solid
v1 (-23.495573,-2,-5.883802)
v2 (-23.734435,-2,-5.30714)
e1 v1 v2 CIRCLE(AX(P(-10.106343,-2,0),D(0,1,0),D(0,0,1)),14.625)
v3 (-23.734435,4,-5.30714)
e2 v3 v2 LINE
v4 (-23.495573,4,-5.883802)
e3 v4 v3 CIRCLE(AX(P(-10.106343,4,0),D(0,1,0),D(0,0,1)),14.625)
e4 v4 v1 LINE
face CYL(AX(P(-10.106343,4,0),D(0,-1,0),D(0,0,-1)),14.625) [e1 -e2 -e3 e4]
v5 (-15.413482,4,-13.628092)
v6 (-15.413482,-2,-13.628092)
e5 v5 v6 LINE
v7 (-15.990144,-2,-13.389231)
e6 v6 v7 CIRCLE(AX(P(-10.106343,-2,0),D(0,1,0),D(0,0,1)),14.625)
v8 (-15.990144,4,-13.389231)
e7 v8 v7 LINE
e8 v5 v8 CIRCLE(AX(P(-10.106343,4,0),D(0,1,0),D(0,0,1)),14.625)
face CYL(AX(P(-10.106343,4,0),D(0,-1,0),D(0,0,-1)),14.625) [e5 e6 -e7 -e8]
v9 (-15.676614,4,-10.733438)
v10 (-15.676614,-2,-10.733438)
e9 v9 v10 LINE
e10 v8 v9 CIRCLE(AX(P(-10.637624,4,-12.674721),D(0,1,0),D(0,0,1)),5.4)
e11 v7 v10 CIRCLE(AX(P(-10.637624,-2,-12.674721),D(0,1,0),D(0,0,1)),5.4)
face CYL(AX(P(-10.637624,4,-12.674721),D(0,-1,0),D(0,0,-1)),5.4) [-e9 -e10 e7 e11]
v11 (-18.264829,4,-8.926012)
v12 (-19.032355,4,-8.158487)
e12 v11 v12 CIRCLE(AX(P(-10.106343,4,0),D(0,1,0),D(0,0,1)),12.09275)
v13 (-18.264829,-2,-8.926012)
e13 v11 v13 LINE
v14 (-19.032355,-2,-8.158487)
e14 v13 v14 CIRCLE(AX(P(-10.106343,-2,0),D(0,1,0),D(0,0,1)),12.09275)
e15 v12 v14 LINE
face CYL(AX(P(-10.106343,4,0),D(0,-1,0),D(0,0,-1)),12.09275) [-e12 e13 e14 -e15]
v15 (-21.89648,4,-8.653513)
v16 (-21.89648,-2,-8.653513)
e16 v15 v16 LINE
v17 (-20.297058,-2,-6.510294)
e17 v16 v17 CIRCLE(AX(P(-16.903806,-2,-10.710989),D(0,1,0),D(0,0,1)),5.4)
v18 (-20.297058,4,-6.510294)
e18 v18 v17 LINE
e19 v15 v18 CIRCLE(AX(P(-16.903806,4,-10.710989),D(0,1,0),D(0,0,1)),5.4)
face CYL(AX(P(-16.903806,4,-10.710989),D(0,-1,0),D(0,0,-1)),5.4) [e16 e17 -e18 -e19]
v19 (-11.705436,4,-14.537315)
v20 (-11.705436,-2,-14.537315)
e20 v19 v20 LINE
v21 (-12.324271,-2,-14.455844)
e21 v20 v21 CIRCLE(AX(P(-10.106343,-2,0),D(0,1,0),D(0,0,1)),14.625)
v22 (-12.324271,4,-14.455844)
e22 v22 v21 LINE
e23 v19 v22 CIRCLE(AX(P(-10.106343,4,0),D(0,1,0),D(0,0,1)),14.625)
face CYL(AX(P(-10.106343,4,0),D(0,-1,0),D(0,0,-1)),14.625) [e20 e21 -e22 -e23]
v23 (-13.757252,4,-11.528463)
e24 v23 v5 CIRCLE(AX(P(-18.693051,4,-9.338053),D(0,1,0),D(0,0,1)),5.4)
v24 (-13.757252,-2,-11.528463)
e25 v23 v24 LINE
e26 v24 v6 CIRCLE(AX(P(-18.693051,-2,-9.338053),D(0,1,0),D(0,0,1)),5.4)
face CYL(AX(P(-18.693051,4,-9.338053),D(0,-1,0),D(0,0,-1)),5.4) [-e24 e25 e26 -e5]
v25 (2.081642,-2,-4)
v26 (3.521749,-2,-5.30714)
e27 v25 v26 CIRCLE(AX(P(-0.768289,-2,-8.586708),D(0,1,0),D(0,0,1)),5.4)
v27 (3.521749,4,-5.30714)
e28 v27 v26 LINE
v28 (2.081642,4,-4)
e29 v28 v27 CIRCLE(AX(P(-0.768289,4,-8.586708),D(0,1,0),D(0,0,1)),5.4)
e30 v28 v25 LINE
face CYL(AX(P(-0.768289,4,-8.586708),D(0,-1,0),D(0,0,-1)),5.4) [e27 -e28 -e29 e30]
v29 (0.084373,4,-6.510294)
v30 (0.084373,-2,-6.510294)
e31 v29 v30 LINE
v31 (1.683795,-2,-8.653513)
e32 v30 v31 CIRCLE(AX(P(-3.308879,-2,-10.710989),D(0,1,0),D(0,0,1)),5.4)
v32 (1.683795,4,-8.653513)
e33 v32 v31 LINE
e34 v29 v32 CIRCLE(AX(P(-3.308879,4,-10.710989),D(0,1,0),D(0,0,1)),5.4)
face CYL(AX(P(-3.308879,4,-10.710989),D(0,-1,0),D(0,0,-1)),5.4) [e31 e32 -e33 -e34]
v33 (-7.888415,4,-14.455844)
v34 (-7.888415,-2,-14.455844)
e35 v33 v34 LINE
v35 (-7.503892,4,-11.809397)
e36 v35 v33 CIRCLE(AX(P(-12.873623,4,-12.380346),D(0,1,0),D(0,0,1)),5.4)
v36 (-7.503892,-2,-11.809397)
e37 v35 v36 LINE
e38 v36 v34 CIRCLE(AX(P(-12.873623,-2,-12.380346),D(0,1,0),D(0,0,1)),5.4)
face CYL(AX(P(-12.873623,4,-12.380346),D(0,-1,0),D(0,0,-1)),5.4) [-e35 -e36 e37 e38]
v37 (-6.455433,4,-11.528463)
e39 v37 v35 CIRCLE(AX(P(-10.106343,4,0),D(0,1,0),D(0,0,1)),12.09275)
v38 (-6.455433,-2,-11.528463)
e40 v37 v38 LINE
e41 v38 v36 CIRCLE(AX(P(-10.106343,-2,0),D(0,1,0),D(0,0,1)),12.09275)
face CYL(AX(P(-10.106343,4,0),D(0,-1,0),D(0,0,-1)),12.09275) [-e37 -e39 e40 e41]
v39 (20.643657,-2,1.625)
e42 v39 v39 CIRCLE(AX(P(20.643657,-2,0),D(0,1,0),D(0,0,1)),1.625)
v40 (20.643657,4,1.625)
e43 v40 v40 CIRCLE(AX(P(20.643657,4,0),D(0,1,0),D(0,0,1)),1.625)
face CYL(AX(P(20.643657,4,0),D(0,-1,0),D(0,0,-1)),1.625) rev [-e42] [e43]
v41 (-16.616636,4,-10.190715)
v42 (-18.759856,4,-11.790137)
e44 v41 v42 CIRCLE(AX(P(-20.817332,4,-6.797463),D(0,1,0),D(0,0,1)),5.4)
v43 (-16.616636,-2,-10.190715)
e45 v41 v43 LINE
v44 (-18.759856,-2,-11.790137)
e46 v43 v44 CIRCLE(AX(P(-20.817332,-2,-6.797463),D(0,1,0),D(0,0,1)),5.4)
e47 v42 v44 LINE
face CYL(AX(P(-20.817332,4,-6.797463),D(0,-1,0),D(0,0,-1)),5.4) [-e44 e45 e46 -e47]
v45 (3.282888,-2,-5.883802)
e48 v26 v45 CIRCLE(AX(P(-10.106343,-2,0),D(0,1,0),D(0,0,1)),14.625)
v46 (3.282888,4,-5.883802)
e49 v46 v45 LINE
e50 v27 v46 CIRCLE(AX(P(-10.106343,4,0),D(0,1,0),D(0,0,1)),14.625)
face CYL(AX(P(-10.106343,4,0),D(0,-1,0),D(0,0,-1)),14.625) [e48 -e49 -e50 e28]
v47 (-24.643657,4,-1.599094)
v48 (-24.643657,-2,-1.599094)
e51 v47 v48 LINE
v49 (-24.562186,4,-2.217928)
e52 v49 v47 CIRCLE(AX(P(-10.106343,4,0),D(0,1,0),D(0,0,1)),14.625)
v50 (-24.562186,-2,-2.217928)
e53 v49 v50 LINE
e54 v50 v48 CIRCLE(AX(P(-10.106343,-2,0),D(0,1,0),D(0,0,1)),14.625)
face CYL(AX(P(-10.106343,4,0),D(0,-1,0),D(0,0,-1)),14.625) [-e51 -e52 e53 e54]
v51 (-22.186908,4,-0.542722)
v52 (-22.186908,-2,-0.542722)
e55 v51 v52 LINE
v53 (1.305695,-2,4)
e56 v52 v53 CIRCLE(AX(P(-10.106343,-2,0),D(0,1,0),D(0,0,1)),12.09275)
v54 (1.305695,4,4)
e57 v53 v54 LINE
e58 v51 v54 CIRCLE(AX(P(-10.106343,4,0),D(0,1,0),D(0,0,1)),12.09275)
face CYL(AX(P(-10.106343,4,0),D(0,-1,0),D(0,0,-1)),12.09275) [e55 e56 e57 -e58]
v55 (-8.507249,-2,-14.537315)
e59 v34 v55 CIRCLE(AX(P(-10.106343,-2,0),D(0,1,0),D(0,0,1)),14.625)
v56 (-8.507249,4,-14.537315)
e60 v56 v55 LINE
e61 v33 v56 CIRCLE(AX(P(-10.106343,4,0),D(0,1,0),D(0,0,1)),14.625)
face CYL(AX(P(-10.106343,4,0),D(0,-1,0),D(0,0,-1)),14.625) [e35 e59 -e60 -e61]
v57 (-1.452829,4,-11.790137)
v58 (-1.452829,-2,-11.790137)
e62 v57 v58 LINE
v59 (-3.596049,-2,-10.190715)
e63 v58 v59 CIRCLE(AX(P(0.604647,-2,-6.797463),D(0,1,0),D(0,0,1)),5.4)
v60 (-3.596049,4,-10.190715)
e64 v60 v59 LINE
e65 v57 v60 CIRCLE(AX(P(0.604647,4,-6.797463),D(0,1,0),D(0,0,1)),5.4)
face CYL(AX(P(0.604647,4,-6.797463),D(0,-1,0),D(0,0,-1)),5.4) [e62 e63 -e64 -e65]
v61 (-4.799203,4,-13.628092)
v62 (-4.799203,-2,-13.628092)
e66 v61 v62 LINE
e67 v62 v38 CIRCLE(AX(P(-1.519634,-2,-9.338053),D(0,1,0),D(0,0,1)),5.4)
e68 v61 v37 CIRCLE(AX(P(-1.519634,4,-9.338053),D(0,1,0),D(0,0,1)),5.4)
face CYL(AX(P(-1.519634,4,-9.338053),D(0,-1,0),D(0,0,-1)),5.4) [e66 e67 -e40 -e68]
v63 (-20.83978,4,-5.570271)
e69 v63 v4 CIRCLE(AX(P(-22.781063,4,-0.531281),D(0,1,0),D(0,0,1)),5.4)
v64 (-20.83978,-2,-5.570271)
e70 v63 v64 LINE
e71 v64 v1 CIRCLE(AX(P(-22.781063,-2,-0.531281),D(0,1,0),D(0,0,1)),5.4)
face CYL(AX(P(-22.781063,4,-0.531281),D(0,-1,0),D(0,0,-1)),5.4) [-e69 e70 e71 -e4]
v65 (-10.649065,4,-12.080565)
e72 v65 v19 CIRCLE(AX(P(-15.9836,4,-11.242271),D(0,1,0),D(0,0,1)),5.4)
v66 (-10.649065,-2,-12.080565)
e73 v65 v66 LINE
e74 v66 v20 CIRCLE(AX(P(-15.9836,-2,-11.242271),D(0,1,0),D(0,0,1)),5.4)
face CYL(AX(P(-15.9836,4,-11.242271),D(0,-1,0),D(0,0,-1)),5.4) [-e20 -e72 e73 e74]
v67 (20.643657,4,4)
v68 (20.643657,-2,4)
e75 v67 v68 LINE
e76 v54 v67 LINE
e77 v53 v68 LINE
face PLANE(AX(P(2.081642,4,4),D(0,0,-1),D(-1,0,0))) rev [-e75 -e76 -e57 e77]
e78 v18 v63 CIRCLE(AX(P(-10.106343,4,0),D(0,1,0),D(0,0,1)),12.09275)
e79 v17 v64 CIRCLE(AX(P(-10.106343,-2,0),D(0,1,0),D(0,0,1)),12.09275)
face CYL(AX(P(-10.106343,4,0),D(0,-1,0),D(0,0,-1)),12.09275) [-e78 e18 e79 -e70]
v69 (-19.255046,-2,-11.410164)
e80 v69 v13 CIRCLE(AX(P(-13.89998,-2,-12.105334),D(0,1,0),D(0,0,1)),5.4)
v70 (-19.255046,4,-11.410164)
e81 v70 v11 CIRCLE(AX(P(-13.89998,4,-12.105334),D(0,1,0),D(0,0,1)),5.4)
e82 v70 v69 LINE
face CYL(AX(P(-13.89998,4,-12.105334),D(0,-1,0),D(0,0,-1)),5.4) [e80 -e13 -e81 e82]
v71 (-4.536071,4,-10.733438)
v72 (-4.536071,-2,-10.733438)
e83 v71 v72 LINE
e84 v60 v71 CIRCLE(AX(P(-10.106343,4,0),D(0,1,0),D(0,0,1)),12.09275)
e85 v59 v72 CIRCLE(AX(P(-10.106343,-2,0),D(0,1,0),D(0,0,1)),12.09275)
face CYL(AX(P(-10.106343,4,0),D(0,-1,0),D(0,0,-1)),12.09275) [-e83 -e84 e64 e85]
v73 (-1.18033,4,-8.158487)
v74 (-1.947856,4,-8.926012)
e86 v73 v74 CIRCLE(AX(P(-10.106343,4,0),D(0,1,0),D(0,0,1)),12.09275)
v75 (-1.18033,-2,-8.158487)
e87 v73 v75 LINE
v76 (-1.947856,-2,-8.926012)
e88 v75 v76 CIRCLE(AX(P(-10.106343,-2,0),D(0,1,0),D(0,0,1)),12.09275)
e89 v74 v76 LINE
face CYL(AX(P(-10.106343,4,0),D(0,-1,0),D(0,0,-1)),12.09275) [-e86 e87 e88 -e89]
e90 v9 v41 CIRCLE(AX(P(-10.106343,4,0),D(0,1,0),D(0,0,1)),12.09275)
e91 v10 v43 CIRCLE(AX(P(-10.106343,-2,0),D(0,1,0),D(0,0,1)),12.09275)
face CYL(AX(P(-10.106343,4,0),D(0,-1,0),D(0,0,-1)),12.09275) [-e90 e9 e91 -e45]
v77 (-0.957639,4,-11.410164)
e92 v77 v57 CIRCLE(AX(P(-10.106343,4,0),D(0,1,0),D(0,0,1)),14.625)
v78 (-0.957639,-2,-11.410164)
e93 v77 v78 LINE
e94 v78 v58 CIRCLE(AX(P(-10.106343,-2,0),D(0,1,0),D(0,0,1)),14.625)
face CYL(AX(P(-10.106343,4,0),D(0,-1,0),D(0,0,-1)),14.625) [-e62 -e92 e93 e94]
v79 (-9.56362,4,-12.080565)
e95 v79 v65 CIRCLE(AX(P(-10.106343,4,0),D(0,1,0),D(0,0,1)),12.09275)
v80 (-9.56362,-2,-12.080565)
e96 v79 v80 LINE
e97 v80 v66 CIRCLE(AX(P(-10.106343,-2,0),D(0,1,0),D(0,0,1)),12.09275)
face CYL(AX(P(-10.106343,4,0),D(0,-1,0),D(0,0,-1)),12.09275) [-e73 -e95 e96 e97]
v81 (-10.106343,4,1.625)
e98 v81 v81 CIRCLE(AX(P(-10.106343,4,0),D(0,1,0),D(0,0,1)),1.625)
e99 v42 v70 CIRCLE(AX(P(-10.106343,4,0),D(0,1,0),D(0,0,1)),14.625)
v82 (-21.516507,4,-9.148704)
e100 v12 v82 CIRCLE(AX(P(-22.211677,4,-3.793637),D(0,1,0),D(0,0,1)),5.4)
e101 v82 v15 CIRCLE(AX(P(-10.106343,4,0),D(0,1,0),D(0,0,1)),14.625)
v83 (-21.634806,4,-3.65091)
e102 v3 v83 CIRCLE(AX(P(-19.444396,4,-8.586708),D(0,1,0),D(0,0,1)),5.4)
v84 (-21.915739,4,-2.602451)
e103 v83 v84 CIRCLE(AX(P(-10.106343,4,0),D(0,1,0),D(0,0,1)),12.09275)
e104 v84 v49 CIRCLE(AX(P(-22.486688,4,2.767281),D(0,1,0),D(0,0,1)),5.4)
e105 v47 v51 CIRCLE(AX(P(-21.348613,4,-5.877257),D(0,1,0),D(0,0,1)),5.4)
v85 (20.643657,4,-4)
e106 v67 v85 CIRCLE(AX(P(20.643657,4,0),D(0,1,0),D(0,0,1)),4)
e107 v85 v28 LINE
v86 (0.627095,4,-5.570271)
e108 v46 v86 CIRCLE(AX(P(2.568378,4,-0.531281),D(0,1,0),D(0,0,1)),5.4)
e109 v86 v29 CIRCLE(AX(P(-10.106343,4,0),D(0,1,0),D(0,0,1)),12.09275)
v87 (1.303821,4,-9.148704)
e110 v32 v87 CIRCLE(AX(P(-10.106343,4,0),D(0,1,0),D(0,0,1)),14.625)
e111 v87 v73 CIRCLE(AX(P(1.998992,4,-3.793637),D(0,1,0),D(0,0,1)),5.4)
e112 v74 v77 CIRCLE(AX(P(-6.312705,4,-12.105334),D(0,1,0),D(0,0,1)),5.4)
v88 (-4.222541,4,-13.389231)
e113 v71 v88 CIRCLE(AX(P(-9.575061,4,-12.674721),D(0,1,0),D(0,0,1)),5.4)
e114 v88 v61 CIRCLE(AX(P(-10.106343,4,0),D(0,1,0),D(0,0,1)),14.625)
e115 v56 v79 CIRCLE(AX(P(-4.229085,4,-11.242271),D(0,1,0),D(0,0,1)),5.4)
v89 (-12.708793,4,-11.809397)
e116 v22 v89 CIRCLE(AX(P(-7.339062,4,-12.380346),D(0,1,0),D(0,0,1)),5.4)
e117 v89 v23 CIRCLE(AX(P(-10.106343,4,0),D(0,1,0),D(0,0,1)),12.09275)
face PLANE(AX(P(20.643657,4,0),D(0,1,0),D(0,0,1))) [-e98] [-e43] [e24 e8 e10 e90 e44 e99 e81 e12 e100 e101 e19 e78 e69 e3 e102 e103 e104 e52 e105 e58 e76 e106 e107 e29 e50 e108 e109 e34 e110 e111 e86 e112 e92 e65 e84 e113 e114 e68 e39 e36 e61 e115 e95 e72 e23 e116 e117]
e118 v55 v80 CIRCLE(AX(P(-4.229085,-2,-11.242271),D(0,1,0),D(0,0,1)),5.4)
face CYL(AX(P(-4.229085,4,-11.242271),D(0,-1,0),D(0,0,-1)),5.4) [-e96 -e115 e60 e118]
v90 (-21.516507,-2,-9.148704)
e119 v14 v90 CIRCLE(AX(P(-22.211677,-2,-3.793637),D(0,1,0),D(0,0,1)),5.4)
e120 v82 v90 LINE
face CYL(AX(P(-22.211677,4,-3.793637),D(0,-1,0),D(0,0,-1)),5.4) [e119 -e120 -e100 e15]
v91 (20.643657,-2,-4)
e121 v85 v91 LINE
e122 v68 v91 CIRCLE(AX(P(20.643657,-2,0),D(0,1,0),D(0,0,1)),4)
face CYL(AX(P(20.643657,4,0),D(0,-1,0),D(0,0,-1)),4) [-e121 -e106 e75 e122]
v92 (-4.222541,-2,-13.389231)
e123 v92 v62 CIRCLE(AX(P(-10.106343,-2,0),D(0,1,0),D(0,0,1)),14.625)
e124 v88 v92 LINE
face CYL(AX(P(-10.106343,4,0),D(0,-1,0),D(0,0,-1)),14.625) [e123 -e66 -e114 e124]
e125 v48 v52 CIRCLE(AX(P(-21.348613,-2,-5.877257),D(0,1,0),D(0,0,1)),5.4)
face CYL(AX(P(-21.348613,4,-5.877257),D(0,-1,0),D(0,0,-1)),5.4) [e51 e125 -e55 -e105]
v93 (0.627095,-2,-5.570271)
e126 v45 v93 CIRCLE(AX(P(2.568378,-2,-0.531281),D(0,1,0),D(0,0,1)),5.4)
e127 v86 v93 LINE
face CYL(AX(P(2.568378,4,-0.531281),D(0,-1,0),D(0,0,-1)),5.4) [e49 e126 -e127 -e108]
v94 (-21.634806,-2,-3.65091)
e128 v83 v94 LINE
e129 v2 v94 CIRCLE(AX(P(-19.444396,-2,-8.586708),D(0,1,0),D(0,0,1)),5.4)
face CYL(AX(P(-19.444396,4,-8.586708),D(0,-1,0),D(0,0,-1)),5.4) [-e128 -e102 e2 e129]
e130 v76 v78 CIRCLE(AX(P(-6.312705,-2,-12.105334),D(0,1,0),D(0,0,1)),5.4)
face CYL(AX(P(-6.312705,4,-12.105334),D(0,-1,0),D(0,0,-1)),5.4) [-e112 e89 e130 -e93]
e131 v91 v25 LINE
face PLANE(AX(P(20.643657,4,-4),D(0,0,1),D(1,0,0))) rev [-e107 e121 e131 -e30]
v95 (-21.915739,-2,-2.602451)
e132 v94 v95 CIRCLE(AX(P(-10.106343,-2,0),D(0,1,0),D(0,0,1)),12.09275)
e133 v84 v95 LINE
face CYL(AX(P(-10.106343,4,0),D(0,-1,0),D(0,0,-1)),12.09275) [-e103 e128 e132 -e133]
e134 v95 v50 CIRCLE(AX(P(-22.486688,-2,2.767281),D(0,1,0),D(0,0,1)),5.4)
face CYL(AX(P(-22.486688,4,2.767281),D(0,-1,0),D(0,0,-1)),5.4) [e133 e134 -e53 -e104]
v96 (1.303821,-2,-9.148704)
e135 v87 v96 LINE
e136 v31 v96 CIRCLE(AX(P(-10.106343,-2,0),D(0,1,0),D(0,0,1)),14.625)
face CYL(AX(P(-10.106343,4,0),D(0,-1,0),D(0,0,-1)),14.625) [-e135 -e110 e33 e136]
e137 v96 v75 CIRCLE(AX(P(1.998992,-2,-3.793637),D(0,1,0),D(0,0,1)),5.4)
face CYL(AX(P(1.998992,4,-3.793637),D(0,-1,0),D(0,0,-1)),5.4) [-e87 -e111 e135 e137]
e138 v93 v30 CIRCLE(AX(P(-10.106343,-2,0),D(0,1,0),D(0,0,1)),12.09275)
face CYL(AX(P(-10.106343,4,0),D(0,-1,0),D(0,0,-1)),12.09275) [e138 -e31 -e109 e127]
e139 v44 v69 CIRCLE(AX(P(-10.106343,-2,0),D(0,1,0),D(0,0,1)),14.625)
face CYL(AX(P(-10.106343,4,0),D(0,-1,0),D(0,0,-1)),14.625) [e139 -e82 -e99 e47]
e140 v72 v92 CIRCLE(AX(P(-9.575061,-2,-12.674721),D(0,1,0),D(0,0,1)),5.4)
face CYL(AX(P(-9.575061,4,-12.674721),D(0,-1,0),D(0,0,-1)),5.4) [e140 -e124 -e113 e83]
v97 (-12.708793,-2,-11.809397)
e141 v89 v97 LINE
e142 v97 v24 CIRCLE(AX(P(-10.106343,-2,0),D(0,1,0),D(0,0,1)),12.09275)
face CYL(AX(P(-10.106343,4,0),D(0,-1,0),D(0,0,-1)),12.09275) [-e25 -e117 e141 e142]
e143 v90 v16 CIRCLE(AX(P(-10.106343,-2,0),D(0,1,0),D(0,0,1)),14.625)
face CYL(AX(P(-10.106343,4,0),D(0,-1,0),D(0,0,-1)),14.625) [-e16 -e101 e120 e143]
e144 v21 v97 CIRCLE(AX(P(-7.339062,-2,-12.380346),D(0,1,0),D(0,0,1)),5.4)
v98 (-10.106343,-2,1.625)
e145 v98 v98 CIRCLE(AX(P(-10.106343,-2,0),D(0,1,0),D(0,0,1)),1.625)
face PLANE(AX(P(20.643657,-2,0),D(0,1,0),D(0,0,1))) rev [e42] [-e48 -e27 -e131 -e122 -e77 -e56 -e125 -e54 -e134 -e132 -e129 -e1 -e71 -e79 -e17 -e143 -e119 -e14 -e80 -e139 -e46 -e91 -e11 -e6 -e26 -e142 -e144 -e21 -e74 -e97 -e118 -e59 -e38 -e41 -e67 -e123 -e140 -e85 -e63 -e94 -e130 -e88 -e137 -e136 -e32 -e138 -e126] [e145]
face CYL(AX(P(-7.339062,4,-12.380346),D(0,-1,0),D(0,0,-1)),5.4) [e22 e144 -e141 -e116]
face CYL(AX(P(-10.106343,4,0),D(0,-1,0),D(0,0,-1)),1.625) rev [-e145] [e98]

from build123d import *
from build123d.topology import SkipClean

# Parameters (mm, degrees)
SKETCH1_R            = 1.625
BOSS_EXTRUDE1_DEPTH  = 4
CUT_EXTRUDE1_START   = -10
CUT_EXTRUDE1_DEPTH   = 10
MOVE_START           = -2
MOVE_FACE1_OUTLINE_R = 1.625
MOVE_FACE1_DEPTH     = 2


# Read off the part's stored shape, not the designer's step: Move Face1
with BuildPart() as part:
    # Sketch1 → Boss-Extrude1 (new body)
    with BuildSketch(Plane(origin=(0, 0, 0), x_dir=(1, 0, 0), z_dir=(0, 1, 0))):
        with BuildLine():
            Line((20.643657446, 4), (2.081641936, 4))
            ThreePointArc((2.081641936, 4), (2.861028333, 4.588201733), (3.521749436, 5.30713988))
            ThreePointArc((3.521749436, 5.30713988), (3.405395609, 5.596745198), (3.282888305, 5.883801663))
            ThreePointArc((3.282888305, 5.883801663), (1.93527598, 5.894040025), (0.627094961, 5.57027124))
            ThreePointArc((0.627094961, 5.57027124), (0.366286148, 6.046375), (0.084372603, 6.510293938))
            ThreePointArc((0.084372603, 6.510293938), (1.018855105, 7.48132754), (1.683794586, 8.65351323))
            ThreePointArc((1.683794586, 8.65351323), (1.496450048, 8.903135899), (1.303821399, 9.148703928))
            ThreePointArc((1.303821399, 9.148703928), (-0.000522033, 8.809805691), (-1.180330337, 8.158486898))
            ThreePointArc((-1.180330337, 8.158486898), (-1.555477026, 8.550865528), (-1.947855656, 8.926012217))
            ThreePointArc((-1.947855656, 8.926012217), (-1.296536862, 10.105820521), (-0.957638625, 11.410163953))
            ThreePointArc((-0.957638625, 11.410163953), (-1.203206655, 11.602792602), (-1.452829324, 11.79013714))
            ThreePointArc((-1.452829324, 11.79013714), (-2.625015014, 11.125197659), (-3.596048616, 10.190715157))
            ThreePointArc((-3.596048616, 10.190715157), (-4.059967554, 10.472628702), (-4.536071314, 10.733437515))
            ThreePointArc((-4.536071314, 10.733437515), (-4.212302529, 12.041618533), (-4.222540891, 13.389230859))
            ThreePointArc((-4.222540891, 13.389230859), (-4.509597355, 13.511738163), (-4.799202674, 13.62809199))
            ThreePointArc((-4.799202674, 13.62809199), (-5.759348103, 12.682425791), (-6.455432668, 11.528463019))
            ThreePointArc((-6.455432668, 11.528463019), (-6.976508546, 11.680699536), (-7.503891752, 11.809396783))
            ThreePointArc((-7.503891752, 11.809396783), (-7.529737283, 13.156800143), (-7.888414517, 14.455843809))
            ThreePointArc((-7.888414517, 14.455843809), (-8.197396993, 14.499881098), (-8.507248835, 14.537314892))
            ThreePointArc((-8.507248835, 14.537314892), (-9.18992168, 13.375367565), (-9.563620196, 12.080565177))
            ThreePointArc((-9.563620196, 12.080565177), (-10.106342554, 12.09275), (-10.649064912, 12.080565177))
            ThreePointArc((-10.649064912, 12.080565177), (-11.022763428, 13.375367565), (-11.705436272, 14.537314892))
            ThreePointArc((-11.705436272, 14.537314892), (-12.015288115, 14.499881098), (-12.324270591, 14.455843809))
            ThreePointArc((-12.324270591, 14.455843809), (-12.682947825, 13.156800143), (-12.708793355, 11.809396783))
            ThreePointArc((-12.708793355, 11.809396783), (-13.236176561, 11.680699536), (-13.757252439, 11.528463019))
            ThreePointArc((-13.757252439, 11.528463019), (-14.453337005, 12.682425791), (-15.413482434, 13.62809199))
            ThreePointArc((-15.413482434, 13.62809199), (-15.703087752, 13.511738163), (-15.990144217, 13.389230859))
            ThreePointArc((-15.990144217, 13.389230859), (-16.000382579, 12.041618533), (-15.676613793, 10.733437515))
            ThreePointArc((-15.676613793, 10.733437515), (-16.152717554, 10.472628702), (-16.616636492, 10.190715157))
            ThreePointArc((-16.616636492, 10.190715157), (-17.587670094, 11.125197659), (-18.759855783, 11.79013714))
            ThreePointArc((-18.759855783, 11.79013714), (-19.009478453, 11.602792602), (-19.255046482, 11.410163953))
            ThreePointArc((-19.255046482, 11.410163953), (-18.916148245, 10.105820521), (-18.264829452, 8.926012217))
            ThreePointArc((-18.264829452, 8.926012217), (-18.657208082, 8.550865528), (-19.032354771, 8.158486898))
            ThreePointArc((-19.032354771, 8.158486898), (-20.212163074, 8.809805691), (-21.516506507, 9.148703928))
            ThreePointArc((-21.516506507, 9.148703928), (-21.709135156, 8.903135899), (-21.896479694, 8.65351323))
            ThreePointArc((-21.896479694, 8.65351323), (-21.231540213, 7.48132754), (-20.297057711, 6.510293938))
            ThreePointArc((-20.297057711, 6.510293938), (-20.578971255, 6.046375), (-20.839780068, 5.57027124))
            ThreePointArc((-20.839780068, 5.57027124), (-22.147961087, 5.894040025), (-23.495573413, 5.883801663))
            ThreePointArc((-23.495573413, 5.883801663), (-23.618080717, 5.596745198), (-23.734434544, 5.30713988))
            ThreePointArc((-23.734434544, 5.30713988), (-22.788768345, 4.346994451), (-21.634805572, 3.650909885))
            ThreePointArc((-21.634805572, 3.650909885), (-21.78704209, 3.129834008), (-21.915739337, 2.602450802))
            ThreePointArc((-21.915739337, 2.602450802), (-23.263142697, 2.576605271), (-24.562186363, 2.217928037))
            ThreePointArc((-24.562186363, 2.217928037), (-24.606223651, 1.908945561), (-24.643657446, 1.599093719))
            ThreePointArc((-24.643657446, 1.599093719), (-23.481710119, 0.916420874), (-22.186907731, 0.542722358))
            ThreePointArc((-22.186907731, 0.542722358), (-22.199092554, 0), (-22.186907731, -0.542722358))
            ThreePointArc((-22.186907731, -0.542722358), (-23.481710119, -0.916420874), (-24.643657446, -1.599093719))
            ThreePointArc((-24.643657446, -1.599093719), (-24.606223651, -1.908945561), (-24.562186363, -2.217928037))
            ThreePointArc((-24.562186363, -2.217928037), (-23.263142697, -2.576605271), (-21.915739337, -2.602450802))
            ThreePointArc((-21.915739337, -2.602450802), (-21.78704209, -3.129834008), (-21.634805572, -3.650909885))
            ThreePointArc((-21.634805572, -3.650909885), (-22.788768345, -4.346994451), (-23.734434544, -5.30713988))
            ThreePointArc((-23.734434544, -5.30713988), (-23.618080717, -5.596745198), (-23.495573413, -5.883801663))
            ThreePointArc((-23.495573413, -5.883801663), (-22.147961087, -5.894040025), (-20.839780068, -5.57027124))
            ThreePointArc((-20.839780068, -5.57027124), (-20.578971255, -6.046375), (-20.297057711, -6.510293938))
            ThreePointArc((-20.297057711, -6.510293938), (-21.231540213, -7.48132754), (-21.896479694, -8.65351323))
            ThreePointArc((-21.896479694, -8.65351323), (-21.709135156, -8.903135899), (-21.516506507, -9.148703928))
            ThreePointArc((-21.516506507, -9.148703928), (-20.212163074, -8.809805691), (-19.032354771, -8.158486898))
            ThreePointArc((-19.032354771, -8.158486898), (-18.657208082, -8.550865528), (-18.264829452, -8.926012217))
            ThreePointArc((-18.264829452, -8.926012217), (-18.916148245, -10.105820521), (-19.255046482, -11.410163953))
            ThreePointArc((-19.255046482, -11.410163953), (-19.009478453, -11.602792602), (-18.759855783, -11.79013714))
            ThreePointArc((-18.759855783, -11.79013714), (-17.587670094, -11.125197659), (-16.616636492, -10.190715157))
            ThreePointArc((-16.616636492, -10.190715157), (-16.152717554, -10.472628702), (-15.676613793, -10.733437515))
            ThreePointArc((-15.676613793, -10.733437515), (-16.000382579, -12.041618533), (-15.990144217, -13.389230859))
            ThreePointArc((-15.990144217, -13.389230859), (-15.703087752, -13.511738163), (-15.413482434, -13.62809199))
            ThreePointArc((-15.413482434, -13.62809199), (-14.453337005, -12.682425791), (-13.757252439, -11.528463019))
            ThreePointArc((-13.757252439, -11.528463019), (-13.236176561, -11.680699536), (-12.708793355, -11.809396783))
            ThreePointArc((-12.708793355, -11.809396783), (-12.682947825, -13.156800143), (-12.324270591, -14.455843809))
            ThreePointArc((-12.324270591, -14.455843809), (-12.015288115, -14.499881098), (-11.705436272, -14.537314892))
            ThreePointArc((-11.705436272, -14.537314892), (-11.022763428, -13.375367565), (-10.649064912, -12.080565177))
            ThreePointArc((-10.649064912, -12.080565177), (-10.106342554, -12.09275), (-9.563620196, -12.080565177))
            ThreePointArc((-9.563620196, -12.080565177), (-9.18992168, -13.375367565), (-8.507248835, -14.537314892))
            ThreePointArc((-8.507248835, -14.537314892), (-8.197396993, -14.499881098), (-7.888414517, -14.455843809))
            ThreePointArc((-7.888414517, -14.455843809), (-7.529737283, -13.156800143), (-7.503891752, -11.809396783))
            ThreePointArc((-7.503891752, -11.809396783), (-6.976508546, -11.680699536), (-6.455432668, -11.528463019))
            ThreePointArc((-6.455432668, -11.528463019), (-5.759348103, -12.682425791), (-4.799202674, -13.62809199))
            ThreePointArc((-4.799202674, -13.62809199), (-4.509597355, -13.511738163), (-4.222540891, -13.389230859))
            ThreePointArc((-4.222540891, -13.389230859), (-4.212302529, -12.041618533), (-4.536071314, -10.733437515))
            ThreePointArc((-4.536071314, -10.733437515), (-4.059967554, -10.472628702), (-3.596048616, -10.190715157))
            ThreePointArc((-3.596048616, -10.190715157), (-2.625015014, -11.125197659), (-1.452829324, -11.79013714))
            ThreePointArc((-1.452829324, -11.79013714), (-1.203206655, -11.602792602), (-0.957638625, -11.410163953))
            ThreePointArc((-0.957638625, -11.410163953), (-1.296536862, -10.105820521), (-1.947855656, -8.926012217))
            ThreePointArc((-1.947855656, -8.926012217), (-1.555477026, -8.550865528), (-1.180330337, -8.158486898))
            ThreePointArc((-1.180330337, -8.158486898), (-0.000522033, -8.809805691), (1.303821399, -9.148703928))
            ThreePointArc((1.303821399, -9.148703928), (1.496450048, -8.903135899), (1.683794586, -8.65351323))
            ThreePointArc((1.683794586, -8.65351323), (1.018855105, -7.48132754), (0.084372603, -6.510293938))
            ThreePointArc((0.084372603, -6.510293938), (0.366286148, -6.046375), (0.627094961, -5.57027124))
            ThreePointArc((0.627094961, -5.57027124), (1.93527598, -5.894040025), (3.282888305, -5.883801663))
            ThreePointArc((3.282888305, -5.883801663), (3.405395609, -5.596745198), (3.521749436, -5.30713988))
            ThreePointArc((3.521749436, -5.30713988), (2.861028333, -4.588201733), (2.081641936, -4))
            Line((2.081641936, -4), (20.643657446, -4))
            ThreePointArc((20.643657446, -4), (24.643657446, 0), (20.643657446, 4))
        make_face()
        with Locations(Location((-10.106342554, 0, 0), (0, 0, 270))):
            Circle(SKETCH1_R, mode=Mode.SUBTRACT)
        with Locations(Location((20.643657446, 0, 0), (0, 0, 270))):
            Circle(SKETCH1_R, mode=Mode.SUBTRACT)
    extrude(amount=BOSS_EXTRUDE1_DEPTH)

    # Sketch2 → Cut-Extrude1 (cut)
    with SkipClean():  # the faces are left unmerged after this step: merging them gives an invalid solid
        with BuildSketch(Plane(origin=(0, 4, 0), x_dir=(1, 0, 0), z_dir=(0, 1, 0)).offset(CUT_EXTRUDE1_START)):
            with BuildLine():
                ThreePointArc((-24.562186363, -2.217928037), (-23.263142697, -2.576605271), (-21.915739337, -2.602450802))
                ThreePointArc((-21.915739337, -2.602450802), (-22.095637401, -1.578420611), (-22.186907731, -0.542722358))
                ThreePointArc((-22.186907731, -0.542722358), (-23.481710119, -0.916420874), (-24.643657446, -1.599093719))
                ThreePointArc((-24.643657446, -1.599093719), (-24.606223651, -1.908945561), (-24.562186363, -2.217928037))
            make_face()
            with BuildLine():
                ThreePointArc((-23.495573413, -5.883801663), (-22.147961087, -5.894040025), (-20.839780068, -5.57027124))
                ThreePointArc((-20.839780068, -5.57027124), (-21.278586771, -4.627695077), (-21.634805572, -3.650909885))
                ThreePointArc((-21.634805572, -3.650909885), (-22.788768345, -4.346994451), (-23.734434544, -5.30713988))
                ThreePointArc((-23.734434544, -5.30713988), (-23.618080717, -5.596745198), (-23.495573413, -5.883801663))
            make_face()
            with BuildLine():
                ThreePointArc((-21.516506507, -9.148703928), (-20.212163074, -8.809805691), (-19.032354771, -8.158486898))
                ThreePointArc((-19.032354771, -8.158486898), (-19.70016616, -7.361599771), (-20.297057711, -6.510293938))
                ThreePointArc((-20.297057711, -6.510293938), (-21.231540213, -7.48132754), (-21.896479694, -8.65351323))
                ThreePointArc((-21.896479694, -8.65351323), (-21.709135156, -8.903135899), (-21.516506507, -9.148703928))
            make_face()
            with BuildLine():
                ThreePointArc((-18.759855783, -11.79013714), (-17.587670094, -11.125197659), (-16.616636492, -10.190715157))
                ThreePointArc((-16.616636492, -10.190715157), (-17.467942324, -9.593823606), (-18.264829452, -8.926012217))
                ThreePointArc((-18.264829452, -8.926012217), (-18.916148245, -10.105820521), (-19.255046482, -11.410163953))
                ThreePointArc((-19.255046482, -11.410163953), (-19.009478453, -11.602792602), (-18.759855783, -11.79013714))
            make_face()
            with BuildLine():
                ThreePointArc((-15.413482434, -13.62809199), (-14.453337005, -12.682425791), (-13.757252439, -11.528463019))
                ThreePointArc((-13.757252439, -11.528463019), (-14.734037631, -11.172244217), (-15.676613793, -10.733437515))
                ThreePointArc((-15.676613793, -10.733437515), (-16.000382579, -12.041618533), (-15.990144217, -13.389230859))
                ThreePointArc((-15.990144217, -13.389230859), (-15.703087752, -13.511738163), (-15.413482434, -13.62809199))
            make_face()
            with BuildLine():
                ThreePointArc((-11.705436272, -14.537314892), (-11.022763428, -13.375367565), (-10.649064912, -12.080565177))
                ThreePointArc((-10.649064912, -12.080565177), (-11.684763165, -11.989294847), (-12.708793355, -11.809396783))
                ThreePointArc((-12.708793355, -11.809396783), (-12.682947825, -13.156800143), (-12.324270591, -14.455843809))
                ThreePointArc((-12.324270591, -14.455843809), (-12.015288115, -14.499881098), (-11.705436272, -14.537314892))
            make_face()
            with BuildLine():
                ThreePointArc((-7.888414517, -14.455843809), (-7.529737283, -13.156800143), (-7.503891752, -11.809396783))
                ThreePointArc((-7.503891752, -11.809396783), (-8.527921943, -11.989294847), (-9.563620196, -12.080565177))
                ThreePointArc((-9.563620196, -12.080565177), (-9.18992168, -13.375367565), (-8.507248835, -14.537314892))
                ThreePointArc((-8.507248835, -14.537314892), (-8.197396993, -14.499881098), (-7.888414517, -14.455843809))
            make_face()
            with BuildLine():
                ThreePointArc((-4.222540891, -13.389230859), (-4.212302529, -12.041618533), (-4.536071314, -10.733437515))
                ThreePointArc((-4.536071314, -10.733437515), (-5.478647477, -11.172244217), (-6.455432668, -11.528463019))
                ThreePointArc((-6.455432668, -11.528463019), (-5.759348103, -12.682425791), (-4.799202674, -13.62809199))
                ThreePointArc((-4.799202674, -13.62809199), (-4.509597355, -13.511738163), (-4.222540891, -13.389230859))
            make_face()
            with BuildLine():
                ThreePointArc((-0.957638625, -11.410163953), (-1.296536862, -10.105820521), (-1.947855656, -8.926012217))
                ThreePointArc((-1.947855656, -8.926012217), (-2.744742783, -9.593823606), (-3.596048616, -10.190715157))
                ThreePointArc((-3.596048616, -10.190715157), (-2.625015014, -11.125197659), (-1.452829324, -11.79013714))
                ThreePointArc((-1.452829324, -11.79013714), (-1.203206655, -11.602792602), (-0.957638625, -11.410163953))
            make_face()
            with BuildLine():
                ThreePointArc((1.683794586, -8.65351323), (1.018855105, -7.48132754), (0.084372603, -6.510293938))
                ThreePointArc((0.084372603, -6.510293938), (-0.512518948, -7.361599771), (-1.180330337, -8.158486898))
                ThreePointArc((-1.180330337, -8.158486898), (-0.000522033, -8.809805691), (1.303821399, -9.148703928))
                ThreePointArc((1.303821399, -9.148703928), (1.496450048, -8.903135899), (1.683794586, -8.65351323))
            make_face()
            with BuildLine():
                ThreePointArc((3.521749436, -5.30713988), (2.861028333, -4.588201733), (2.081641936, -4))
                Line((2.081641936, -4), (1.305695063, -4))
                ThreePointArc((1.305695063, -4), (0.994195953, -4.797149927), (0.627094961, -5.57027124))
                ThreePointArc((0.627094961, -5.57027124), (1.93527598, -5.894040025), (3.282888305, -5.883801663))
                ThreePointArc((3.282888305, -5.883801663), (3.405395609, -5.596745198), (3.521749436, -5.30713988))
            make_face()
        extrude(amount=CUT_EXTRUDE1_DEPTH, mode=Mode.SUBTRACT)

    # Move Face1 outline → Move Face1 (add)
    with SkipClean():  # the faces are left unmerged after this step: merging them gives an invalid solid
        with BuildSketch(Plane(origin=(0, 0, 0), x_dir=(1, 0, 0), z_dir=(0, 1, 0)).offset(MOVE_START)):
            with BuildLine():
                ThreePointArc((20.643657446, -4), (24.643657446, 0), (20.643657446, 4))
                Line((20.643657446, 4), (2.081641936, 4))
                ThreePointArc((2.081641936, 4), (2.861028333, 4.588201733), (3.521749436, 5.30713988))
                ThreePointArc((3.521749436, 5.30713988), (3.405395609, 5.596745198), (3.282888305, 5.883801663))
                ThreePointArc((3.282888305, 5.883801663), (1.93527598, 5.894040025), (0.627094961, 5.57027124))
                ThreePointArc((0.627094961, 5.57027124), (0.366286148, 6.046375), (0.084372603, 6.510293938))
                ThreePointArc((0.084372603, 6.510293938), (1.018855105, 7.48132754), (1.683794586, 8.65351323))
                ThreePointArc((1.683794586, 8.65351323), (1.496450048, 8.903135899), (1.303821399, 9.148703928))
                ThreePointArc((1.303821399, 9.148703928), (-0.000522033, 8.809805691), (-1.180330337, 8.158486898))
                ThreePointArc((-1.180330337, 8.158486898), (-1.555477026, 8.550865528), (-1.947855656, 8.926012217))
                ThreePointArc((-1.947855656, 8.926012217), (-1.296536862, 10.105820521), (-0.957638625, 11.410163953))
                ThreePointArc((-0.957638625, 11.410163953), (-1.203206654, 11.602792602), (-1.452829324, 11.79013714))
                ThreePointArc((-1.452829324, 11.79013714), (-2.625015014, 11.125197659), (-3.596048616, 10.190715157))
                ThreePointArc((-3.596048616, 10.190715157), (-4.059967554, 10.472628702), (-4.536071314, 10.733437515))
                ThreePointArc((-4.536071314, 10.733437515), (-4.212302529, 12.041618534), (-4.222540891, 13.389230859))
                ThreePointArc((-4.222540891, 13.389230859), (-4.509597356, 13.511738163), (-4.799202674, 13.62809199))
                ThreePointArc((-4.799202674, 13.62809199), (-5.759348103, 12.682425792), (-6.455432668, 11.528463019))
                ThreePointArc((-6.455432668, 11.528463019), (-6.976508546, 11.680699536), (-7.503891752, 11.809396783))
                ThreePointArc((-7.503891752, 11.809396783), (-7.529737283, 13.156800143), (-7.888414517, 14.455843809))
                ThreePointArc((-7.888414517, 14.455843809), (-8.197396993, 14.499881098), (-8.507248835, 14.537314892))
                ThreePointArc((-8.507248835, 14.537314892), (-9.18992168, 13.375367565), (-9.563620196, 12.080565177))
                ThreePointArc((-9.563620196, 12.080565177), (-10.106342554, 12.09275), (-10.649064912, 12.080565177))
                ThreePointArc((-10.649064912, 12.080565177), (-11.022763428, 13.375367565), (-11.705436272, 14.537314892))
                ThreePointArc((-11.705436272, 14.537314892), (-12.015288115, 14.499881098), (-12.324270591, 14.455843809))
                ThreePointArc((-12.324270591, 14.455843809), (-12.682947825, 13.156800143), (-12.708793355, 11.809396783))
                ThreePointArc((-12.708793355, 11.809396783), (-13.236176561, 11.680699536), (-13.757252439, 11.528463019))
                ThreePointArc((-13.757252439, 11.528463019), (-14.453337005, 12.682425791), (-15.413482434, 13.62809199))
                ThreePointArc((-15.413482434, 13.62809199), (-15.703087752, 13.511738163), (-15.990144217, 13.389230859))
                ThreePointArc((-15.990144217, 13.389230859), (-16.000382579, 12.041618533), (-15.676613793, 10.733437515))
                ThreePointArc((-15.676613793, 10.733437515), (-16.152717554, 10.472628702), (-16.616636492, 10.190715157))
                ThreePointArc((-16.616636492, 10.190715157), (-17.587670094, 11.125197659), (-18.759855783, 11.79013714))
                ThreePointArc((-18.759855783, 11.79013714), (-19.009478453, 11.602792602), (-19.255046482, 11.410163953))
                ThreePointArc((-19.255046482, 11.410163953), (-18.916148245, 10.105820521), (-18.264829452, 8.926012217))
                ThreePointArc((-18.264829452, 8.926012217), (-18.657208082, 8.550865528), (-19.032354771, 8.158486898))
                ThreePointArc((-19.032354771, 8.158486898), (-20.212163075, 8.809805691), (-21.516506507, 9.148703928))
                ThreePointArc((-21.516506507, 9.148703928), (-21.709135156, 8.903135899), (-21.896479694, 8.65351323))
                ThreePointArc((-21.896479694, 8.65351323), (-21.231540213, 7.48132754), (-20.297057711, 6.510293938))
                ThreePointArc((-20.297057711, 6.510293938), (-20.578971255, 6.046375), (-20.839780068, 5.57027124))
                ThreePointArc((-20.839780068, 5.57027124), (-22.147961087, 5.894040025), (-23.495573413, 5.883801663))
                ThreePointArc((-23.495573413, 5.883801663), (-23.618080717, 5.596745198), (-23.734434544, 5.30713988))
                ThreePointArc((-23.734434544, 5.30713988), (-22.788768345, 4.346994451), (-21.634805572, 3.650909885))
                ThreePointArc((-21.634805572, 3.650909885), (-21.78704209, 3.129834008), (-21.915739337, 2.602450802))
                ThreePointArc((-21.915739337, 2.602450802), (-23.263142697, 2.576605271), (-24.562186363, 2.217928037))
                ThreePointArc((-24.562186363, 2.217928037), (-24.606223651, 1.908945561), (-24.643657446, 1.599093719))
                ThreePointArc((-24.643657446, 1.599093719), (-23.481710119, 0.916420874), (-22.186907731, 0.542722358))
                ThreePointArc((-22.186907731, 0.542722358), (-12.402167869, -11.872817218), (1.305695063, -4))
                Line((1.305695063, -4), (20.643657446, -4))
            make_face()
            with Locations((-10.106342554, 0)):
                Circle(MOVE_FACE1_OUTLINE_R, mode=Mode.SUBTRACT)
            with Locations((20.643657446, 0)):
                Circle(MOVE_FACE1_OUTLINE_R, mode=Mode.SUBTRACT)
        extrude(amount=MOVE_FACE1_DEPTH)


solid = part.part
